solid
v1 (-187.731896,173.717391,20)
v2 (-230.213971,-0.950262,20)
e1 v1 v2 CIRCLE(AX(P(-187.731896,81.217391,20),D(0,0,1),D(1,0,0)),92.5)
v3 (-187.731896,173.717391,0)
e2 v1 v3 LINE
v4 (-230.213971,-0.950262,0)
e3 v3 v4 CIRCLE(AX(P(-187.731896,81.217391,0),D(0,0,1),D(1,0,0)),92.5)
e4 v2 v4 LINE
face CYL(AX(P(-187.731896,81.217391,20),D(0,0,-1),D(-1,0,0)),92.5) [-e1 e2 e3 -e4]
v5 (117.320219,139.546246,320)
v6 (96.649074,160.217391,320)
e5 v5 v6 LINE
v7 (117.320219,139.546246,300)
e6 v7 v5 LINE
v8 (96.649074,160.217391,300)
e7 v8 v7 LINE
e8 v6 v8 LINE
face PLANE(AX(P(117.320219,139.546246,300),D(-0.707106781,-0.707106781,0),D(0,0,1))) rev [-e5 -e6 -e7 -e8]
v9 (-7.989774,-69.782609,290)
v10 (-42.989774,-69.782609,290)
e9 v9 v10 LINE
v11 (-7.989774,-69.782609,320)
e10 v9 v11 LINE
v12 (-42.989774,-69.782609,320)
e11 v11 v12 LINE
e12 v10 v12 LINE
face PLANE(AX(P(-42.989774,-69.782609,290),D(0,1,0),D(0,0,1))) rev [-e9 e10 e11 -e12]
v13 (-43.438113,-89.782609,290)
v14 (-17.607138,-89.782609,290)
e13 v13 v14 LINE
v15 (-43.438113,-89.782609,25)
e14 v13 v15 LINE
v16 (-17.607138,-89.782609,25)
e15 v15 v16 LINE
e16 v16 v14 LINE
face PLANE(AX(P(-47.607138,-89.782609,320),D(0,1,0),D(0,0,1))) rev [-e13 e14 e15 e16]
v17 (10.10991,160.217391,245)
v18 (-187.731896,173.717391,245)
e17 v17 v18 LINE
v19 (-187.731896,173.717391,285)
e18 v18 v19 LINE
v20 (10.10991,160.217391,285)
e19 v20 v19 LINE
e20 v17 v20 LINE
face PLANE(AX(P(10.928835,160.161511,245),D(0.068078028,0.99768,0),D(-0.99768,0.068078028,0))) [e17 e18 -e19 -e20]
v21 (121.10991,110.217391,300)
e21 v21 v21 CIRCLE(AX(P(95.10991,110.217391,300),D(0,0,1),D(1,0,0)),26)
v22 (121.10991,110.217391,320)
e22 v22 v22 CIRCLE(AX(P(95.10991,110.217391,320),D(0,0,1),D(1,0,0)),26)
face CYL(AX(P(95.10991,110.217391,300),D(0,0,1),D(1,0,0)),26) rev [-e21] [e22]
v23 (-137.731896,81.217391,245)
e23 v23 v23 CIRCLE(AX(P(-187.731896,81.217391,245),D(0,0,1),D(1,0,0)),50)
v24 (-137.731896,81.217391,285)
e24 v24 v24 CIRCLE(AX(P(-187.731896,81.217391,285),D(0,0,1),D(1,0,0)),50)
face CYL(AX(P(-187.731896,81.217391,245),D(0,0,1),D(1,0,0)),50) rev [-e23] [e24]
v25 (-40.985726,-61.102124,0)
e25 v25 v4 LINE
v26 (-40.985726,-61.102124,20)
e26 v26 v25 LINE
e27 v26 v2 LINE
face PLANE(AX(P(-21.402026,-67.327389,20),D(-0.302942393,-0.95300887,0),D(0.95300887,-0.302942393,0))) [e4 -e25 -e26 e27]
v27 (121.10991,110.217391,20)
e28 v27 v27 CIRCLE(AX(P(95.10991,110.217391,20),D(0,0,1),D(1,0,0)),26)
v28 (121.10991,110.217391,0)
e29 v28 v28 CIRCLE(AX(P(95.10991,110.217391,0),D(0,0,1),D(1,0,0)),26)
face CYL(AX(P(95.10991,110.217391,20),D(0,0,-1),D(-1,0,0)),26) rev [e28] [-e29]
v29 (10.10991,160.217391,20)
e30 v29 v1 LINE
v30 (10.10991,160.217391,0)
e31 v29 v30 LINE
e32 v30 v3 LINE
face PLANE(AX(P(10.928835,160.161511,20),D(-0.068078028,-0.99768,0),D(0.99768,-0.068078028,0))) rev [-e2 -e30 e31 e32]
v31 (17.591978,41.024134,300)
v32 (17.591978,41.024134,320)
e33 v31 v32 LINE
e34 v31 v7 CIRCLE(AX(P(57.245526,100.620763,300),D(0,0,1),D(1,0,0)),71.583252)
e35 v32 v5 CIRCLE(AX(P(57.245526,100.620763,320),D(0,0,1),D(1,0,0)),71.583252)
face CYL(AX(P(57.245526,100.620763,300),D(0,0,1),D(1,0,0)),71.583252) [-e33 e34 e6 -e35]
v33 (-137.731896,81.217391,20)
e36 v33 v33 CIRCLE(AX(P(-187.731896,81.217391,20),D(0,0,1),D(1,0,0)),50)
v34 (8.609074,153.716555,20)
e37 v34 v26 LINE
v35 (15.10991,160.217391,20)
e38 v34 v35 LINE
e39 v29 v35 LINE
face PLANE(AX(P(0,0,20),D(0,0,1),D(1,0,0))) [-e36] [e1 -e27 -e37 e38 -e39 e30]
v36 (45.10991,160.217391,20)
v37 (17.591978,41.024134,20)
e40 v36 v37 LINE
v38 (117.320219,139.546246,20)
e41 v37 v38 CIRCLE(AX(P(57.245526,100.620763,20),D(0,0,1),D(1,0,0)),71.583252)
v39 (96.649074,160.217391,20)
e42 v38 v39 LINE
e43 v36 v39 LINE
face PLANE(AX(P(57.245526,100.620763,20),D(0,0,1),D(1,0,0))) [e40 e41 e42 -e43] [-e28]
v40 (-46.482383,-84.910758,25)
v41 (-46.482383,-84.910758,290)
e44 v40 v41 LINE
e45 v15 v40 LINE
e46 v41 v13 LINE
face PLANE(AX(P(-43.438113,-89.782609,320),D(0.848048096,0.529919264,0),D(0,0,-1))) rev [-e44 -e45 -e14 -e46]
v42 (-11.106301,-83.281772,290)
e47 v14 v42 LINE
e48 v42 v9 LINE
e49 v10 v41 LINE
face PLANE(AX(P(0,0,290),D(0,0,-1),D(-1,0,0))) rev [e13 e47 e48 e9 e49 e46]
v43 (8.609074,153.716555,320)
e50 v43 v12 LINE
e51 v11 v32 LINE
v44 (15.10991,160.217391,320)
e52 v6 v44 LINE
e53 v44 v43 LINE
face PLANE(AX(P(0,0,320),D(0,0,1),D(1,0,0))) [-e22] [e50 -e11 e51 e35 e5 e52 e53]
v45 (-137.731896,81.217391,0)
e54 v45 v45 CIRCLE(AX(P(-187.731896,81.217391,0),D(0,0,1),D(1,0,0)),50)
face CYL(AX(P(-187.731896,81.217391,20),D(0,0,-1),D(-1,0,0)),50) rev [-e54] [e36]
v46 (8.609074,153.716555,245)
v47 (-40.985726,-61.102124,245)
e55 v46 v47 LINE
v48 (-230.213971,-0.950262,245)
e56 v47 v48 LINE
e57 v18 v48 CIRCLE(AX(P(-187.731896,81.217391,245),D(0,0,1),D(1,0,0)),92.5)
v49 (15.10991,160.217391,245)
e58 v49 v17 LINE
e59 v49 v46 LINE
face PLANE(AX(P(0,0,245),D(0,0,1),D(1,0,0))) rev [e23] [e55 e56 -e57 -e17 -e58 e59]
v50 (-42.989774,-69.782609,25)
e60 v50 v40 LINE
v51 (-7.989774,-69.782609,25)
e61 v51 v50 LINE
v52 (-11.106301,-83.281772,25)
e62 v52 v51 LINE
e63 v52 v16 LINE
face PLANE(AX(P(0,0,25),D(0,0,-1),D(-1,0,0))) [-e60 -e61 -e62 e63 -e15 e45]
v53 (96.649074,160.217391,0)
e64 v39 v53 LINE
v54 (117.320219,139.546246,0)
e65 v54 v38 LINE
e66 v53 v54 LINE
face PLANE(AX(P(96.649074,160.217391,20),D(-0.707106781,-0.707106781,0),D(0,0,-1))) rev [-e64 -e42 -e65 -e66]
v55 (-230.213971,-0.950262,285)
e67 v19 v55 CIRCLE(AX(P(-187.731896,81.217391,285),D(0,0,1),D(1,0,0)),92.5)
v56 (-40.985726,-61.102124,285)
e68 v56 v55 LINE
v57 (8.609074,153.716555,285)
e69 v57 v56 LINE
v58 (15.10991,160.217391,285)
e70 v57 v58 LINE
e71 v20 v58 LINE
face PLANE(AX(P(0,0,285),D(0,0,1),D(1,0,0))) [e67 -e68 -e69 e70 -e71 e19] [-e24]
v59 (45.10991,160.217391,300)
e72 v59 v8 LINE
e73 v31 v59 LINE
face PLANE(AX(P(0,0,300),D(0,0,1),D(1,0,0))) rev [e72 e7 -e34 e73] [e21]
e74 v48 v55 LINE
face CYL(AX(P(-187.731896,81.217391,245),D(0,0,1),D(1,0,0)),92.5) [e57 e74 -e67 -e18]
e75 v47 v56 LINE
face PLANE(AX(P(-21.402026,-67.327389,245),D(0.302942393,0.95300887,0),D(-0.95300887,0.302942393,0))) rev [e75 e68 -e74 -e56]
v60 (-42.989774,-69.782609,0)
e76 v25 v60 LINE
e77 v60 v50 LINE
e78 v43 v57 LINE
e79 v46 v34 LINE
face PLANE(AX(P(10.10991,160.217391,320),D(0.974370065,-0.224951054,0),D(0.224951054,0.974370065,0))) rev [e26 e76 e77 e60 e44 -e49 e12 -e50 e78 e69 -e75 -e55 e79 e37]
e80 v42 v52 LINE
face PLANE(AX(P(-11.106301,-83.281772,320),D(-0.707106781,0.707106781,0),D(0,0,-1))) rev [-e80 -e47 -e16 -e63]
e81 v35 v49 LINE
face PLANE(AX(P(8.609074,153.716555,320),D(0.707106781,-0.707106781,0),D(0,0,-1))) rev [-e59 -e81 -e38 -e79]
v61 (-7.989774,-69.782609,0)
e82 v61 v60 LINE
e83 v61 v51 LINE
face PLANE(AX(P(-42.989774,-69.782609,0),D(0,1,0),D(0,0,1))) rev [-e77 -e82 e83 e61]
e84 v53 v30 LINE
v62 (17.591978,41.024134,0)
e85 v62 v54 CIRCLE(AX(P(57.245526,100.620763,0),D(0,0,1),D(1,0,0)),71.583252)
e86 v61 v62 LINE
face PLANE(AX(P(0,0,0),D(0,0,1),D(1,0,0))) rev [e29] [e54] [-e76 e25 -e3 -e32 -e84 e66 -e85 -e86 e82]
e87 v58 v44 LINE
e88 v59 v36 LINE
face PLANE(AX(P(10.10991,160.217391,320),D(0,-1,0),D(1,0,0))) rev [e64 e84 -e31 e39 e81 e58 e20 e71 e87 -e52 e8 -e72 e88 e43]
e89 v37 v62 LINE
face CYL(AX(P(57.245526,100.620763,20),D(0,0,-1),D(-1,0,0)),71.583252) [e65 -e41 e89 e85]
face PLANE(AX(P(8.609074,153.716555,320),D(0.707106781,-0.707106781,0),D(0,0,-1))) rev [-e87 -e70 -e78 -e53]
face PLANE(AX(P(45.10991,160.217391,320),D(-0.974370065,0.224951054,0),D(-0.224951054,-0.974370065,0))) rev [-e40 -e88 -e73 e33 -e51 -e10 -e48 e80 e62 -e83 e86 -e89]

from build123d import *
from OCP.BRepFilletAPI import BRepFilletAPI_MakeChamfer

# Parameters (mm, degrees)
BOSS_EXTRU_1_DEPTH      = 320
ENL_V_MAT_EXTRU_1_DEPTH = 30
ENL_V_START             = -295
ENL_V_MAT_EXTRU_2_DEPTH = 25
ESQUISSE5_R             = 26
BOSS_EXTRU_2_DEPTH      = 20
BOSS_EXTRU_3_START      = -35
ESQUISSE5_3_R           = 50
BOSS_EXTRU_3_DEPTH      = 40
BOSS_EXTRU_4_START      = -300
ESQUISSE5_5_R           = 50
BOSS_EXTRU_4_DEPTH      = 20
BOSS_EXTRU_5_START      = -300
ESQUISSE5_6_R           = 26
BOSS_EXTRU_5_DEPTH      = 20
CHANFREIN1_SIZE         = 5
CHANFREIN1_SIZE_2       = 6.671835022
CHANFREIN2_SIZE         = 5
CHANFREIN2_SIZE2        = 6.671835022
CHANFREIN2_SIZE2_2      = 4.169025226
CHANFREIN5_START        = 181.632019665
CHANFREIN5_OUTLINE_W    = 32
CHANFREIN5_OUTLINE_H    = 22
CHANFREIN5_DEPTH        = 2.367980335
CHANFREIN6_START        = 181.632019665
CHANFREIN6_OUTLINE_W    = 32
CHANFREIN6_OUTLINE_H    = 22
CHANFREIN6_DEPTH        = 2.367980335


with BuildPart() as part:
    # Esquisse1 → Boss.-Extru.1 (new body)
    with BuildSketch(Plane.XY):
        Polygon((10.109909982, 160.217391304), (45.109909982, 160.217391304), (-12.607137799, -89.782608696), (-47.607137799, -89.782608696), align=None)
    extrude(amount=BOSS_EXTRU_1_DEPTH)

    # Esquisse2 → Enlèv. mat.-Extru.1 (cut)
    with BuildSketch(Plane.XY.offset(320)):
        Polygon((-47.607137799, -89.782608696), (-42.989773977, -69.782608696), (-7.989773977, -69.782608696), (-12.607137799, -89.782608696), align=None)
    extrude(amount=-ENL_V_MAT_EXTRU_1_DEPTH, mode=Mode.SUBTRACT)

    # Esquisse3 → Enlèv. mat.-Extru.2 (cut)
    with BuildSketch(Plane.XY.offset(320).offset(ENL_V_START)):
        Polygon((-47.607137799, -89.782608696), (-42.989773977, -69.782608696), (-7.989773977, -69.782608696), (-12.607137799, -89.782608696), align=None)
    extrude(amount=-ENL_V_MAT_EXTRU_2_DEPTH, mode=Mode.SUBTRACT)

    # Esquisse5 → Boss.-Extru.2 (add)
    with BuildSketch(Plane.XY.offset(320)):
        with BuildLine():
            Line((96.899074267, 160.217391304), (45.109909982, 160.217391304))
            Line((45.109909982, 160.217391304), (17.591978342, 41.024134293))
            ThreePointArc((17.591978342, 41.024134293), (116.84215481, 60.967214836), (96.899074267, 160.217391304))
        make_face()
        with Locations((95.109909982, 110.217391304)):
            Circle(ESQUISSE5_R, mode=Mode.SUBTRACT)
    extrude(amount=-BOSS_EXTRU_2_DEPTH)

    # Esquisse5<3> → Boss.-Extru.3 (add)
    with BuildSketch(Plane.XY.offset(320).offset(BOSS_EXTRU_3_START)):
        with BuildLine():
            Line((-230.213971145, -0.950262244), (-40.985726083, -61.102123595))
            Line((-40.985726083, -61.102123595), (10.109909982, 160.217391304))
            Line((10.109909982, 160.217391304), (-187.731895981, 173.717391304))
            ThreePointArc((-187.731895981, 173.717391304), (-277.611698921, 103.077652588), (-230.213971145, -0.950262244))
        make_face()
        with Locations((-187.731895981, 81.217391304)):
            Circle(ESQUISSE5_3_R, mode=Mode.SUBTRACT)
    extrude(amount=-BOSS_EXTRU_3_DEPTH)

    # Esquisse5<5> → Boss.-Extru.4 (add)
    with BuildSketch(Plane.XY.offset(320).offset(BOSS_EXTRU_4_START)):
        with BuildLine():
            Line((-230.213971145, -0.950262244), (-40.985726083, -61.102123595))
            Line((-40.985726083, -61.102123595), (10.109909982, 160.217391304))
            Line((10.109909982, 160.217391304), (-187.731895981, 173.717391304))
            ThreePointArc((-187.731895981, 173.717391304), (-277.611698921, 103.077652588), (-230.213971145, -0.950262244))
        make_face()
        with Locations((-187.731895981, 81.217391304)):
            Circle(ESQUISSE5_5_R, mode=Mode.SUBTRACT)
    extrude(amount=-BOSS_EXTRU_4_DEPTH)

    # Esquisse5<6> → Boss.-Extru.5 (add)
    with BuildSketch(Plane.XY.offset(320).offset(BOSS_EXTRU_5_START)):
        with BuildLine():
            Line((96.899074267, 160.217391304), (45.109909982, 160.217391304))
            Line((45.109909982, 160.217391304), (17.591978342, 41.024134293))
            ThreePointArc((17.591978342, 41.024134293), (116.84215481, 60.967214836), (96.899074267, 160.217391304))
        make_face()
        with Locations((95.109909982, 110.217391304)):
            Circle(ESQUISSE5_6_R, mode=Mode.SUBTRACT)
    extrude(amount=-BOSS_EXTRU_5_DEPTH)

    # Chanfrein1
    # the kernel refuses this chamfer: 6.671835022, 5 mm, written as the material it takes off along each edge
    with BuildSketch(Plane(origin=(10.109909982, 160.217391304, 20), x_dir=(1, 0, 0), z_dir=(0, 0, 1))) as chanfrein1_piece_1:
        Polygon((CHANFREIN1_SIZE, 0), (-CHANFREIN1_SIZE_2 * 0.224951054343, -CHANFREIN1_SIZE_2 * 0.974370064782), (0, 0), align=None)
    extrude(amount=225, mode=Mode.SUBTRACT)
    with BuildSketch(Plane(origin=(10.109909982, 160.217391304, 285), x_dir=(1, 0, 0), z_dir=(0, 0, 1))) as chanfrein1_piece_2:
        Polygon((CHANFREIN1_SIZE, 0), (-CHANFREIN1_SIZE_2 * 0.224951054343, -CHANFREIN1_SIZE_2 * 0.974370064782), (0, 0), align=None)
    extrude(amount=52.24901503, mode=Mode.SUBTRACT)

    # Chanfrein2: one chamfer whose edges measure the first distance from different faces: ONE call of the kernel's chamfer builder (chamfer() names one face for all edges)
    chanfrein2_edges_1 = [part.edges().sort_by_distance(p)[0] for p in [
        (-12.607137799, -89.782608696, 157.5),
    ]]
    chanfrein2_side_1 = [part.faces().sort_by_distance(p)[0] for p in [
        (-30.107137799, -89.782608696, 157.5),
    ]]
    chanfrein2_edges_2 = [part.edges().sort_by_distance(p)[0] for p in [
        (-47.607137799, -89.782608696, 157.5),
    ]]
    chanfrein2_side_2 = [part.faces().sort_by_distance(p)[0] for p in [
        (-19.722598228, 30.998601722, 155.760522115),
    ]]
    chanfrein2 = BRepFilletAPI_MakeChamfer(part.part.solid().wrapped)
    for e in chanfrein2_edges_1:
        chanfrein2.Add(CHANFREIN2_SIZE, CHANFREIN2_SIZE2, e.wrapped, chanfrein2_side_1[0].wrapped)  # the first distance lies on this face
    for e in chanfrein2_edges_2:
        chanfrein2.Add(CHANFREIN2_SIZE, CHANFREIN2_SIZE2_2, e.wrapped, chanfrein2_side_2[0].wrapped)  # the first distance lies on this face
    add(Compound.cast(chanfrein2.Shape()), mode=Mode.REPLACE)

    # Chanfrein5: read off the stored shape, not the designer's step
    # Chanfrein5 outline → Chanfrein5 (cut)
    with BuildSketch(Plane(origin=(0, 0, 0), x_dir=(0.7071067811865471, -0.707106781186548, 0), z_dir=(0.707106781186548, 0.707106781186547, 0)).offset(CHANFREIN5_START)):
        with Locations((-30, -310)):
            Rectangle(CHANFREIN5_OUTLINE_W, CHANFREIN5_OUTLINE_H)
    extrude(amount=CHANFREIN5_DEPTH, mode=Mode.SUBTRACT)

    # Chanfrein6: read off the stored shape, not the designer's step
    # Chanfrein6 outline → Chanfrein6 (cut)
    with BuildSketch(Plane(origin=(0, 0, 0), x_dir=(0.707106781186546, -0.707106781186549, 0), z_dir=(0.707106781186549, 0.707106781186546, 0)).offset(CHANFREIN6_START)):
        with Locations((-30, -10)):
            Rectangle(CHANFREIN6_OUTLINE_W, CHANFREIN6_OUTLINE_H)
    extrude(amount=CHANFREIN6_DEPTH, mode=Mode.SUBTRACT)


solid = part.part
